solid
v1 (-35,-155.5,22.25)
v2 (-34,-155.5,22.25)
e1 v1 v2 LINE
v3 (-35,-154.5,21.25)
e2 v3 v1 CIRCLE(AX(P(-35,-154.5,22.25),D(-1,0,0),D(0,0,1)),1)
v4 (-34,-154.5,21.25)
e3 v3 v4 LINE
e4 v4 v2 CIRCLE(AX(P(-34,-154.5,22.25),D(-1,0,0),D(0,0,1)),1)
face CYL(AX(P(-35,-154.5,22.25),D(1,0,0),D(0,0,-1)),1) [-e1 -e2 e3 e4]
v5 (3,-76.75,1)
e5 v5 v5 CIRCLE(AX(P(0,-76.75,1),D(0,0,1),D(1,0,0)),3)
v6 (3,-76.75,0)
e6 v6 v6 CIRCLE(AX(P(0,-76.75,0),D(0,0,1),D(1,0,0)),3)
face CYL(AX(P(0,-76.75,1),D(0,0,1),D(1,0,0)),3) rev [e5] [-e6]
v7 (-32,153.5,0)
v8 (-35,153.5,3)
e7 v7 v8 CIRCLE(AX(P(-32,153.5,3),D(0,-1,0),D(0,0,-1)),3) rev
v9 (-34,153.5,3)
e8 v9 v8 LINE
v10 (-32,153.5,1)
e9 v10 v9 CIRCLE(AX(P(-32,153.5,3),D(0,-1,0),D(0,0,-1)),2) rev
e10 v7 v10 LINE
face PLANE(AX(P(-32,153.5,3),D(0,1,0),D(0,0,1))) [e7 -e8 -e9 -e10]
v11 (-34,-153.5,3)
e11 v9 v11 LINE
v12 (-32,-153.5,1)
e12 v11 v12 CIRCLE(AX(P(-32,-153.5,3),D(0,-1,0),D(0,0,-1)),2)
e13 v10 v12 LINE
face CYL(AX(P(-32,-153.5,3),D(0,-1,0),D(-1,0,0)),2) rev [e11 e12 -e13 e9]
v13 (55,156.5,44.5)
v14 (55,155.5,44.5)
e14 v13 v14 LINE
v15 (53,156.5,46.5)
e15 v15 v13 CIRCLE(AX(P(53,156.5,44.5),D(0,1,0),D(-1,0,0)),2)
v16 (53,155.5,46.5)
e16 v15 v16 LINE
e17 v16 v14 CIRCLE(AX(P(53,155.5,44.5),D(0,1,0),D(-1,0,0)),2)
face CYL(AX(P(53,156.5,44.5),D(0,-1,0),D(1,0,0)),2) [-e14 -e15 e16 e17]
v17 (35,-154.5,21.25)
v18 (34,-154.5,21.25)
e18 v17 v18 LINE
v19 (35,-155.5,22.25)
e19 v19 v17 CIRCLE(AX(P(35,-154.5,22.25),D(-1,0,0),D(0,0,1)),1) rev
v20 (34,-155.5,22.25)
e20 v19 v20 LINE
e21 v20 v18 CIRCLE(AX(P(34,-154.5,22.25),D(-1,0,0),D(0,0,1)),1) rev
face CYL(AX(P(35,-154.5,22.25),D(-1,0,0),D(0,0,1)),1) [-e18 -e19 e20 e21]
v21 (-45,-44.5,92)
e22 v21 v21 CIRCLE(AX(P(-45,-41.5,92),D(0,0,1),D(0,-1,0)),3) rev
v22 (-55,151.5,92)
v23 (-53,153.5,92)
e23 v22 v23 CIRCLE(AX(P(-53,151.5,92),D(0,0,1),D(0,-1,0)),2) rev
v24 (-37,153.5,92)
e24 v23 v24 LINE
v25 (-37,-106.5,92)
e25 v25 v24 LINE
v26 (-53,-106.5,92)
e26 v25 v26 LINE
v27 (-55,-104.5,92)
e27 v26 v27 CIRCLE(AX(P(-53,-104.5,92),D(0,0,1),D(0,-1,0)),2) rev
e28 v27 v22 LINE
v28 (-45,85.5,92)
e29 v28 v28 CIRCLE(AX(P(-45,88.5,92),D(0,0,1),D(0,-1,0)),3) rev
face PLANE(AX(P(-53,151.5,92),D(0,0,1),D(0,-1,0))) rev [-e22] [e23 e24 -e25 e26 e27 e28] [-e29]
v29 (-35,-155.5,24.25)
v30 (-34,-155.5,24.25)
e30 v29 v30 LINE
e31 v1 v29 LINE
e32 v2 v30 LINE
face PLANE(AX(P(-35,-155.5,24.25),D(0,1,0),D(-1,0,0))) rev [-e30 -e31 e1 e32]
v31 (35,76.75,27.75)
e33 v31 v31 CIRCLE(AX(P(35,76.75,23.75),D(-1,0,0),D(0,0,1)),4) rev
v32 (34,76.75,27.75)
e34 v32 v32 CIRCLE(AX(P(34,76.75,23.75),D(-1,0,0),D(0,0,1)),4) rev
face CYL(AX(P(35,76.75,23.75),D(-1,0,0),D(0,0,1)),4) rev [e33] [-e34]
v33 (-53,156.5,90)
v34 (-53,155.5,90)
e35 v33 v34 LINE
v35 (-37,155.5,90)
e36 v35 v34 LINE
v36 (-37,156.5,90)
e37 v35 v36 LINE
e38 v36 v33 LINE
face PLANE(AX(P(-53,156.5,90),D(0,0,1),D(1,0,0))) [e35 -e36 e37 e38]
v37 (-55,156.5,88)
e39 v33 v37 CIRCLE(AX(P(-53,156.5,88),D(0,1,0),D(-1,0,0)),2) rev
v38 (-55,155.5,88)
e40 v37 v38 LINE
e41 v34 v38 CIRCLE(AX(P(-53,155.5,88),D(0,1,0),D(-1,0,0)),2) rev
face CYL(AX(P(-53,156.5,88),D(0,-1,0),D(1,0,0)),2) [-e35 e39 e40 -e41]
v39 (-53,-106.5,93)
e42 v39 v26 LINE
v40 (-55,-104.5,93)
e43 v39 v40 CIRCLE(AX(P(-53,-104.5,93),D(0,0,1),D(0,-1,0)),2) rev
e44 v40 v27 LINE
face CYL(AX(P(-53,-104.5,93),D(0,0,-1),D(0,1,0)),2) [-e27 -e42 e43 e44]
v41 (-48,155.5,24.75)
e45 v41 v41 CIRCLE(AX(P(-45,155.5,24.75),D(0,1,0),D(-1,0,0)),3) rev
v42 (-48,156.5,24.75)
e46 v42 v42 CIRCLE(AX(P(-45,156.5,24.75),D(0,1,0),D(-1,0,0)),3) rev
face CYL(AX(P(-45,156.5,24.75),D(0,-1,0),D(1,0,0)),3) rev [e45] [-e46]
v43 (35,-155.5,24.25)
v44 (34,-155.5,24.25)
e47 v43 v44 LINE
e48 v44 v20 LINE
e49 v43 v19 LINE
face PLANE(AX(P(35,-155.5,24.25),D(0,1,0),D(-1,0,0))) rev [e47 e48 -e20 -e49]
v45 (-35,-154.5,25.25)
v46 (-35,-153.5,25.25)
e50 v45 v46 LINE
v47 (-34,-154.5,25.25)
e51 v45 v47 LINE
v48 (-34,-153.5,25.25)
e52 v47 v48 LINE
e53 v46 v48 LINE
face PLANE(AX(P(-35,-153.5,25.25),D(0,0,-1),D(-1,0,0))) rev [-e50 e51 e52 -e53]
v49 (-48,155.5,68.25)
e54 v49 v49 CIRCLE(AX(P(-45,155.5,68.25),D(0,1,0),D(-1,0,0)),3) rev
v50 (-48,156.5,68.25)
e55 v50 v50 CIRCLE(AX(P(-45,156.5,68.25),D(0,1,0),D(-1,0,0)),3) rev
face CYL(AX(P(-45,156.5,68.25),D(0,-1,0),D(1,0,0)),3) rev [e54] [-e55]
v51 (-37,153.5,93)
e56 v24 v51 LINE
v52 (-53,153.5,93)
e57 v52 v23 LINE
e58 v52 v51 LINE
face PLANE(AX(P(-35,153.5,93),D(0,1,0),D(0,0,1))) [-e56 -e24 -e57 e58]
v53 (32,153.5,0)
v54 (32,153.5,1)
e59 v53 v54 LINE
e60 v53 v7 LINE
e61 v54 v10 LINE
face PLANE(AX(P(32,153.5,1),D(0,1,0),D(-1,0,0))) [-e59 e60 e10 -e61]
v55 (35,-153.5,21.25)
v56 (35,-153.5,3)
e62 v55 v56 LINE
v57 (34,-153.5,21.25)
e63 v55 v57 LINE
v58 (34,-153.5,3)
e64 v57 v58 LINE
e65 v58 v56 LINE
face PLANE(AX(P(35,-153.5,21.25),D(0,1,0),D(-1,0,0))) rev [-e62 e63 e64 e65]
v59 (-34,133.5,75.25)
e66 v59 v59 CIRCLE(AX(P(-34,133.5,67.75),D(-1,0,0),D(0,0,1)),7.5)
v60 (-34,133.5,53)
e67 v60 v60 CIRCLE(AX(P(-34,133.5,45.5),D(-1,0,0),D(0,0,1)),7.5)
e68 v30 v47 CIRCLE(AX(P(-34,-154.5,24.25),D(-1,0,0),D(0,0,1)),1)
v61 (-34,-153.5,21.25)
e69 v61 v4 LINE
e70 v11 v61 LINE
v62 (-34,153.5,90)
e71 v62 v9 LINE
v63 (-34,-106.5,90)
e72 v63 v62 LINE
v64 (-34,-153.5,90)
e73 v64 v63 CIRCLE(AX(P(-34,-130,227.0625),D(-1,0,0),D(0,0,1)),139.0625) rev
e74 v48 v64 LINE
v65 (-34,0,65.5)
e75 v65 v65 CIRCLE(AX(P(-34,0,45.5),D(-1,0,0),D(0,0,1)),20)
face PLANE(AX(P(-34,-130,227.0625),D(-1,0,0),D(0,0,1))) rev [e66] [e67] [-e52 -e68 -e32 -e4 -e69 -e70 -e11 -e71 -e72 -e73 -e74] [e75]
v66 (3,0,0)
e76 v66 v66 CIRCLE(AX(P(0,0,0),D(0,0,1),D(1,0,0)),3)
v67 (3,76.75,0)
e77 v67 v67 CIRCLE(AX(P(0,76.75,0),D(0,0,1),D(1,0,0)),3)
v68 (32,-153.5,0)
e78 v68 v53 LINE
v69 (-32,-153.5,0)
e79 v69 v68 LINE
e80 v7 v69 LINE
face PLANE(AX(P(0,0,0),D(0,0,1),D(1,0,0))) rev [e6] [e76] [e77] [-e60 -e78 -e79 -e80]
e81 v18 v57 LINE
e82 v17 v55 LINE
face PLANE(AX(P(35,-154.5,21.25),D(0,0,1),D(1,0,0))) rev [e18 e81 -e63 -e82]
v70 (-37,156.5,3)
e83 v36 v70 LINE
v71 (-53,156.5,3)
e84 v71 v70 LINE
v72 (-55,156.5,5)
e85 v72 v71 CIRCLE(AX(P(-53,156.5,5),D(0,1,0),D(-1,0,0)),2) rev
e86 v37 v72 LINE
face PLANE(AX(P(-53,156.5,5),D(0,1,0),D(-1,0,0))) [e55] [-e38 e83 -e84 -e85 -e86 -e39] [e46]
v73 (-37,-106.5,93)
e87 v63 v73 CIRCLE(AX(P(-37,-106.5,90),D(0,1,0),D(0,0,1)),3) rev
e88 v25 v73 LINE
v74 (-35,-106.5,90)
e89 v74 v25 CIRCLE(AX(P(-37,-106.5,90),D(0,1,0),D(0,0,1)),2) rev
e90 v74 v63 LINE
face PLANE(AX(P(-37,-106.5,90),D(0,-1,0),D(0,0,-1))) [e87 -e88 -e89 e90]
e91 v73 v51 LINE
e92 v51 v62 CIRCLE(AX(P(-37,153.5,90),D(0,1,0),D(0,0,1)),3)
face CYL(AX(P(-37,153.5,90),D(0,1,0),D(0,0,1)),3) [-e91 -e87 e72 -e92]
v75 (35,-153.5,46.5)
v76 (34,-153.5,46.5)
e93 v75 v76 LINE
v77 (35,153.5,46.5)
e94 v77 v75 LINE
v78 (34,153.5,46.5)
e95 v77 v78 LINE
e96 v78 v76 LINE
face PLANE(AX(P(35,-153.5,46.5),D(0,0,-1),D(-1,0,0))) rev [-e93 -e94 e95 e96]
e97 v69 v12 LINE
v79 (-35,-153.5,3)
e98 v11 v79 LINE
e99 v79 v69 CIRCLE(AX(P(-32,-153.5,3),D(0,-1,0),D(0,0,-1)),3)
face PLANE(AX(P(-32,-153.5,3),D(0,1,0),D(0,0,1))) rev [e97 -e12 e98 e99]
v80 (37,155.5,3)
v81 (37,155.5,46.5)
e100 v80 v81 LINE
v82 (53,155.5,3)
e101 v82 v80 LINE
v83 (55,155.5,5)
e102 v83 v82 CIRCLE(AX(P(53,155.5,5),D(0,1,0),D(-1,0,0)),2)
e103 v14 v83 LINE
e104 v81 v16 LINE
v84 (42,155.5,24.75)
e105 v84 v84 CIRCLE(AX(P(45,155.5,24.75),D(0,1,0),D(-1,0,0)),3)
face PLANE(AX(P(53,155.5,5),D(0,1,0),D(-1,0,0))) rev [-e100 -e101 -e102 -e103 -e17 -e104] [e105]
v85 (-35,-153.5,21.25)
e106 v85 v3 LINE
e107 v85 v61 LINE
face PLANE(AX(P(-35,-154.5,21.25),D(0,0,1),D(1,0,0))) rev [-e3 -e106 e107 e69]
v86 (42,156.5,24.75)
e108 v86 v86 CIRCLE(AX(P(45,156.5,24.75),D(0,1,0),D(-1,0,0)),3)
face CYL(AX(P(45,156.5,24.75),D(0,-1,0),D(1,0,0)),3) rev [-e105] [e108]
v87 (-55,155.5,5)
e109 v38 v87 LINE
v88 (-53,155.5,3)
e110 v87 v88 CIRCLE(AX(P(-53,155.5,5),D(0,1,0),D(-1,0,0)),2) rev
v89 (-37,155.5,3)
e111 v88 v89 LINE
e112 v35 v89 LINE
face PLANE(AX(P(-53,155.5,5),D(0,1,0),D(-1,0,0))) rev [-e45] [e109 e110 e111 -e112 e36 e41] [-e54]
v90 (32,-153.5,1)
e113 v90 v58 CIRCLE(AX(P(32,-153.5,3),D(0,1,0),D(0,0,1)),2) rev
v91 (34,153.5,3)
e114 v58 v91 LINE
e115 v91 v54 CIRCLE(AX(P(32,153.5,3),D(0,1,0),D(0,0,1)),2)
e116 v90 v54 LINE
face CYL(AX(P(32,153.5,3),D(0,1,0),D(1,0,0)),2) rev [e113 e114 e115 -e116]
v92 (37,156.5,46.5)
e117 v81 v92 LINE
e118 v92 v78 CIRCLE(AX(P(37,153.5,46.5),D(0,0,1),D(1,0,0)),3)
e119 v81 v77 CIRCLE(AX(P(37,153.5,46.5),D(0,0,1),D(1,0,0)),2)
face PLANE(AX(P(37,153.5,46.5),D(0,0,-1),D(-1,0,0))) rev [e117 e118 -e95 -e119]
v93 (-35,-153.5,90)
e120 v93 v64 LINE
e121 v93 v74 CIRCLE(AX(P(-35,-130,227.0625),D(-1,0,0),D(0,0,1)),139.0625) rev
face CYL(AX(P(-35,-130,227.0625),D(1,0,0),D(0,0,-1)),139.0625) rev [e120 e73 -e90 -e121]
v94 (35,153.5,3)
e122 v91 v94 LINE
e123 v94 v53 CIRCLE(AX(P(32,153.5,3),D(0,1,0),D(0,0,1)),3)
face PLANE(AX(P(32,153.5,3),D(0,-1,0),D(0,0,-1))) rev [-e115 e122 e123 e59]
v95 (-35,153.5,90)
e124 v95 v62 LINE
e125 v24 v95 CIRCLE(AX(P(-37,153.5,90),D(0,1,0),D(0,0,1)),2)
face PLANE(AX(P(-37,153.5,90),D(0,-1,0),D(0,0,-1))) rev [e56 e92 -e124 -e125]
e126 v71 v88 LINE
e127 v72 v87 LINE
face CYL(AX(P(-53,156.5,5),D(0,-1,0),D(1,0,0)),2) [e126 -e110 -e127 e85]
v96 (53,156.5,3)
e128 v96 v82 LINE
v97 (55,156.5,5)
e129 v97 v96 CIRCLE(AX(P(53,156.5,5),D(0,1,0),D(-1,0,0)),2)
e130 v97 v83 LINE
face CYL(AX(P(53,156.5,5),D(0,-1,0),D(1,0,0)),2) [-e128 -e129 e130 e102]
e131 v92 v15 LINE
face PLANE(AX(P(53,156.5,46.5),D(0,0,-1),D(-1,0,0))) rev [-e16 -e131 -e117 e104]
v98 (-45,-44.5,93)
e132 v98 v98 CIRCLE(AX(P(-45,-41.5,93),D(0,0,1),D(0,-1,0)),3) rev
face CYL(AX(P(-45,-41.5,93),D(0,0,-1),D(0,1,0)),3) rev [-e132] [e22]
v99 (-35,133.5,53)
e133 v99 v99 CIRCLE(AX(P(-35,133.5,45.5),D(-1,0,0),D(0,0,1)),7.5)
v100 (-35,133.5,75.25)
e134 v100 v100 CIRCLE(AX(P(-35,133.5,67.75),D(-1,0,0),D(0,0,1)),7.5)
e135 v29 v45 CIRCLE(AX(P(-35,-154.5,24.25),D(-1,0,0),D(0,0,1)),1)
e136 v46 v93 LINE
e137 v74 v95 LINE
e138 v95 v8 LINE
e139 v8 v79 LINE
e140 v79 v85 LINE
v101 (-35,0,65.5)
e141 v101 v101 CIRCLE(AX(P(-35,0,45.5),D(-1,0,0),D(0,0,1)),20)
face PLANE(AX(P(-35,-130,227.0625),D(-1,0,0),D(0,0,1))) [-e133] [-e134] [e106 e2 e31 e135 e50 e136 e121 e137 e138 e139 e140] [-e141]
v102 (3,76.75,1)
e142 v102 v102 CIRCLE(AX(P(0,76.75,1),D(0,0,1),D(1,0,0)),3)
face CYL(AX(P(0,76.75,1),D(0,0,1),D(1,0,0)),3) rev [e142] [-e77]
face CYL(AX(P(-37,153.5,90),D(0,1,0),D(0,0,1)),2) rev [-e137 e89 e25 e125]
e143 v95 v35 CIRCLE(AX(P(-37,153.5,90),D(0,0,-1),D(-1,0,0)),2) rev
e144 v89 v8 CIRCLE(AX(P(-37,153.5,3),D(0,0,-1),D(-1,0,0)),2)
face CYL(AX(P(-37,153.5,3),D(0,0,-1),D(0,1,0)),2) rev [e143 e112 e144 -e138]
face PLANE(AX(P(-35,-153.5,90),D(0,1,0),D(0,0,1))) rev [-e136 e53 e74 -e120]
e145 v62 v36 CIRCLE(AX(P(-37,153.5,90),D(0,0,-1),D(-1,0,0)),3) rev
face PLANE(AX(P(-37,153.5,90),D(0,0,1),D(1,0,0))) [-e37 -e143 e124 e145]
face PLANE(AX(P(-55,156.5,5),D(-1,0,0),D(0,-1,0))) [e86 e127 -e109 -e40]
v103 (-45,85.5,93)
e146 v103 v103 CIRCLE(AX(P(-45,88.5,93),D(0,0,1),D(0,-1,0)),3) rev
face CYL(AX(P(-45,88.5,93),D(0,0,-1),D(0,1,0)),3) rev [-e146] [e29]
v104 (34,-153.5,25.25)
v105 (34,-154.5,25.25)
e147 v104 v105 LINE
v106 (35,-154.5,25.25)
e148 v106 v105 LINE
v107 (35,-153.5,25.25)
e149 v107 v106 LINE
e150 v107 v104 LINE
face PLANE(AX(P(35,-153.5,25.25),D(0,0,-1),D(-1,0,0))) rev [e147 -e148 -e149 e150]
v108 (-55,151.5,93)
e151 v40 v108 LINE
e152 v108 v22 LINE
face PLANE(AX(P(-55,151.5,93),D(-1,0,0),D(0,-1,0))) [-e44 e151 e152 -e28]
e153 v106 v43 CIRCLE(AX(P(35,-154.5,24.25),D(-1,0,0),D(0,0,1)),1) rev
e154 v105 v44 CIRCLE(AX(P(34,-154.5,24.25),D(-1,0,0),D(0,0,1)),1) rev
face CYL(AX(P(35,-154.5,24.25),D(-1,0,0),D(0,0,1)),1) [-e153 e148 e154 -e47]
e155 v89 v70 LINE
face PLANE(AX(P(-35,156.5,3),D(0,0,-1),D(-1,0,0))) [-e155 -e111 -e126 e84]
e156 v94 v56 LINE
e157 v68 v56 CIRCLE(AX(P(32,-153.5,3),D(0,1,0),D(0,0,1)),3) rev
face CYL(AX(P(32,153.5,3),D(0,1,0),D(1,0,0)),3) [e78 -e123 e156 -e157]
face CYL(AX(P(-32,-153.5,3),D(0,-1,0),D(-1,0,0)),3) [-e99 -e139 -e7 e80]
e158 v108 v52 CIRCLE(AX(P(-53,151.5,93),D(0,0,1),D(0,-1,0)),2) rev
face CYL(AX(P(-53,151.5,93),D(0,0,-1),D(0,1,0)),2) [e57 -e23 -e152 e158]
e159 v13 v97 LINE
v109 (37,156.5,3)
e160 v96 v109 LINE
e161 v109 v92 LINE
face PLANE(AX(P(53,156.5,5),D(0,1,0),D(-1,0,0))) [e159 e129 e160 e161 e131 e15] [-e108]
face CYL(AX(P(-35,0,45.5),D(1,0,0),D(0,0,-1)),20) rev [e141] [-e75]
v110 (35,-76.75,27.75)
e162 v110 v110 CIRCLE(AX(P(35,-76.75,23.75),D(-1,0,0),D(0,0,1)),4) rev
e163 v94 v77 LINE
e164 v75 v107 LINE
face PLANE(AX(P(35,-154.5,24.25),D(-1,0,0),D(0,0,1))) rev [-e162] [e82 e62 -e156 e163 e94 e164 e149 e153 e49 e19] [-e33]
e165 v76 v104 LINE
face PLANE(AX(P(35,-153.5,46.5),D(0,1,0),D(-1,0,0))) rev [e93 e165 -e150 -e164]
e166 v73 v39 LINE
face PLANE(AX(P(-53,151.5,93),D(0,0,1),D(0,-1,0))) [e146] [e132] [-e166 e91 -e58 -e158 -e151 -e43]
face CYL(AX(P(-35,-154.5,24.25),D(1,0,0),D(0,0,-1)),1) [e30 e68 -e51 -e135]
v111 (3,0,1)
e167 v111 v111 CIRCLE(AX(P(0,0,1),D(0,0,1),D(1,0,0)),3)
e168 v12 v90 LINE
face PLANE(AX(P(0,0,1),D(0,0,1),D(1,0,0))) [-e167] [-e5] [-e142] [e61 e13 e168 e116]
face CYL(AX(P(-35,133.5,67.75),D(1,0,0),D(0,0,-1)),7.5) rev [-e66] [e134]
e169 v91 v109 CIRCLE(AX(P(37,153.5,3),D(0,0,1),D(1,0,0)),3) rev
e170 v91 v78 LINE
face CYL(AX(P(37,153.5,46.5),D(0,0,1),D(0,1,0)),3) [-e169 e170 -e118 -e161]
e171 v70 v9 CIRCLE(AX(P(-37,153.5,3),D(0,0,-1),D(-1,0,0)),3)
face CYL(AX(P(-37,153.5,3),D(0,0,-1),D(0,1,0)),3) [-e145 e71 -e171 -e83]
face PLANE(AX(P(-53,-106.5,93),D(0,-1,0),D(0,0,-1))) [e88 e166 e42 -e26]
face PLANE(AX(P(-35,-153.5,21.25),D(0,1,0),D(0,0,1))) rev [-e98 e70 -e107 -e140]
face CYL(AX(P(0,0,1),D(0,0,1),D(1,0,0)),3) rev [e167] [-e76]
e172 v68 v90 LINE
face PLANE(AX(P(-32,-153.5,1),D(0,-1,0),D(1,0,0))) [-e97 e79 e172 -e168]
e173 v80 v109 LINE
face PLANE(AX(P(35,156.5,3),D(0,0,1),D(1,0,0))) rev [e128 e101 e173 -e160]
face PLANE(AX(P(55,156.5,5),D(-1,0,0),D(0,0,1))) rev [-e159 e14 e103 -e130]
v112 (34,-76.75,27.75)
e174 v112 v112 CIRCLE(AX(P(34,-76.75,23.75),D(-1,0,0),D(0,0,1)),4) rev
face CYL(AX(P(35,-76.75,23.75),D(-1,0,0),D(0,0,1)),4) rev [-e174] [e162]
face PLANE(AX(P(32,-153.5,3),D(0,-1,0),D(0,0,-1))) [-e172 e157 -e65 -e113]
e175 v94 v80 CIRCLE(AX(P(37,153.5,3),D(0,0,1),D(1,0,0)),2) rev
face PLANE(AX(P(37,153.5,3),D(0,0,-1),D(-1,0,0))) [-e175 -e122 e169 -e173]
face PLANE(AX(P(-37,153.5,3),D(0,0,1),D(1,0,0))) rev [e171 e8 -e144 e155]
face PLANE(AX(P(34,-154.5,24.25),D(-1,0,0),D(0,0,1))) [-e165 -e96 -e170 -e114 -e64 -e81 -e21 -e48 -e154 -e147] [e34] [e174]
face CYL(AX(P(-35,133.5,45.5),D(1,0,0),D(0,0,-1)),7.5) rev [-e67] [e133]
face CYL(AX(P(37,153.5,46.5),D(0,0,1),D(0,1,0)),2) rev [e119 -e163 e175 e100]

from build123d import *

# Parameters (mm, degrees)
SKETCH1_W                = 64
SKETCH1_H                = 307
SKETCH1_R                = 3
BOSS_EXTRUDE1_DEPTH      = 1
EDGE_FLANGE1_DEPTH       = 307
EDGE_FLANGE1_START       = 1
EDGE_FLANGE1_PROFILE_R   = 7.5
EDGE_FLANGE1_PROFILE_R_2 = 20
EDGE_FLANGE1_FLAT_DEPTH  = 1
EDGE_FLANGE2_DEPTH       = 260
EDGE_FLANGE2_START       = -1
EDGE_FLANGE2_PROFILE_R   = 3
EDGE_FLANGE2_FLAT_DEPTH  = 1
EDGE_FLANGE3_DEPTH       = 87
EDGE_FLANGE3_START       = -1
EDGE_FLANGE3_PROFILE_R   = 3
EDGE_FLANGE3_FLAT_DEPTH  = 1
EDGE_FLANGE4_DEPTH       = 307
EDGE_FLANGE4_START       = 1
EDGE_FLANGE4_PROFILE_R   = 4
EDGE_FLANGE4_FLAT_DEPTH  = 1
EDGE_FLANGE5_DEPTH       = 43.5
EDGE_FLANGE5_START       = 1
EDGE_FLANGE5_PROFILE_R   = 3
EDGE_FLANGE5_FLAT_DEPTH  = 1


# Sheet-metal steps are written as plain solids
with BuildPart() as part:
    # Sketch1 → Boss-Extrude1 (new body)
    with BuildSketch(Plane.XY):
        Rectangle(SKETCH1_W, SKETCH1_H)
        Circle(SKETCH1_R, mode=Mode.SUBTRACT)
        with Locations((0, 76.75)):
            Circle(SKETCH1_R, mode=Mode.SUBTRACT)
        with Locations((0, -76.75)):
            Circle(SKETCH1_R, mode=Mode.SUBTRACT)
    extrude(amount=BOSS_EXTRUDE1_DEPTH)

    # Edge-Flange1 bend section (across the edge) → Edge-Flange1 (add)
    with BuildSketch(Plane(origin=(-34, 153.5, 1), x_dir=(1, 0, 0), z_dir=(0, -1, 0))):
        with BuildLine():
            Line((-1, 2), (0, 2))
            ThreePointArc((0, 2), (0.585786438, 0.585786438), (2, 0))
            Line((2, 0), (2, -1))
            ThreePointArc((2, -1), (-0.121320344, -0.121320344), (-1, 2))
        make_face()
    extrude(amount=EDGE_FLANGE1_DEPTH)

    # Edge-Flange1 profile (on flange) → Edge-Flange1 flat (add)
    with BuildSketch(Plane(origin=(-34, 0, 1), x_dir=(0, -1, 0), z_dir=(-1, 0, 0)).offset(EDGE_FLANGE1_START)):
        with BuildLine():
            Line((-153.5, 89), (-153.5, 2))
            Line((-153.5, 2), (153.5, 2))
            Line((153.5, 2), (153.5, 20.25))
            Line((153.5, 20.25), (154.5, 20.25))
            ThreePointArc((154.5, 20.25), (155.207106781, 20.542893219), (155.5, 21.25))
            Line((155.5, 21.25), (155.5, 23.25))
            ThreePointArc((155.5, 23.25), (155.207106781, 23.957106781), (154.5, 24.25))
            Line((154.5, 24.25), (153.5, 24.25))
            Line((153.5, 24.25), (153.5, 89))
            ThreePointArc((153.5, 89), (130, 87), (106.5, 89))
            Line((106.5, 89), (-153.5, 89))
        make_face()
        with Locations((-133.5, 44.5)):
            Circle(EDGE_FLANGE1_PROFILE_R, mode=Mode.SUBTRACT)
        with Locations((0, 44.5)):
            Circle(EDGE_FLANGE1_PROFILE_R_2, mode=Mode.SUBTRACT)
        with Locations((-133.5, 66.75)):
            Circle(EDGE_FLANGE1_PROFILE_R, mode=Mode.SUBTRACT)
    extrude(amount=-EDGE_FLANGE1_FLAT_DEPTH)

    # Edge-Flange2 bend section (across the edge) → Edge-Flange2 (add)
    with BuildSketch(Plane(origin=(-35, -106.5, 92), x_dir=(0, 0, -1), z_dir=(0, 1, 0))):
        with BuildLine():
            Line((-1, 2), (0, 2))
            ThreePointArc((0, 2), (0.585786438, 0.585786438), (2, 0))
            Line((2, 0), (2, -1))
            ThreePointArc((2, -1), (-0.121320344, -0.121320344), (-1, 2))
        make_face()
    extrude(amount=EDGE_FLANGE2_DEPTH)

    # Edge-Flange2 profile (on flange) → Edge-Flange2 flat (add)
    with BuildSketch(Plane(origin=(-35, 0, 92), x_dir=(0, -1, 0), z_dir=(0, 0, -1)).offset(EDGE_FLANGE2_START)):
        with BuildLine():
            Line((-153.5, 2), (106.5, 2))
            Line((106.5, 2), (106.5, 18))
            ThreePointArc((106.5, 18), (105.914213562, 19.414213562), (104.5, 20))
            Line((104.5, 20), (-151.5, 20))
            ThreePointArc((-151.5, 20), (-152.914213562, 19.414213562), (-153.5, 18))
            Line((-153.5, 18), (-153.5, 2))
        make_face()
        with Locations((41.5, 10)):
            Circle(EDGE_FLANGE2_PROFILE_R, mode=Mode.SUBTRACT)
        with Locations((-88.5, 10)):
            Circle(EDGE_FLANGE2_PROFILE_R, mode=Mode.SUBTRACT)
    extrude(amount=EDGE_FLANGE2_FLAT_DEPTH)

    # Edge-Flange3 bend section (across the edge) → Edge-Flange3 (add)
    with BuildSketch(Plane(origin=(-35, 155.5, 90), x_dir=(0, -1, 0), z_dir=(0, 0, -1))):
        with BuildLine():
            Line((-1, 2), (0, 2))
            ThreePointArc((0, 2), (0.585786438, 0.585786438), (2, 0))
            Line((2, 0), (2, -1))
            ThreePointArc((2, -1), (-0.121320344, -0.121320344), (-1, 2))
        make_face()
    extrude(amount=EDGE_FLANGE3_DEPTH)

    # Edge-Flange3 profile (on flange) → Edge-Flange3 flat (add)
    with BuildSketch(Plane(origin=(-35, 155.5, 0), x_dir=(0, 0, 1), z_dir=(0, -1, 0)).offset(EDGE_FLANGE3_START)):
        with BuildLine():
            Line((3, 2), (90, 2))
            Line((90, 2), (90, 18))
            ThreePointArc((90, 18), (89.414213562, 19.414213562), (88, 20))
            Line((88, 20), (5, 20))
            ThreePointArc((5, 20), (3.585786438, 19.414213562), (3, 18))
            Line((3, 18), (3, 2))
        make_face()
        with Locations((24.75, 10)):
            Circle(EDGE_FLANGE3_PROFILE_R, mode=Mode.SUBTRACT)
        with Locations((68.25, 10)):
            Circle(EDGE_FLANGE3_PROFILE_R, mode=Mode.SUBTRACT)
    extrude(amount=EDGE_FLANGE3_FLAT_DEPTH)

    # Edge-Flange4 bend section (across the edge) → Edge-Flange4 (add)
    with BuildSketch(Plane(origin=(34, -153.5, 1), x_dir=(-1, 0, 0), z_dir=(0, 1, 0))):
        with BuildLine():
            Line((-1, 2), (0, 2))
            ThreePointArc((0, 2), (0.585786438, 0.585786438), (2, 0))
            Line((2, 0), (2, -1))
            ThreePointArc((2, -1), (-0.121320344, -0.121320344), (-1, 2))
        make_face()
    extrude(amount=EDGE_FLANGE4_DEPTH)

    # Edge-Flange4 profile (on flange) → Edge-Flange4 flat (add)
    with BuildSketch(Plane(origin=(34, 0, 1), x_dir=(0, 1, 0), z_dir=(1, 0, 0)).offset(EDGE_FLANGE4_START)):
        with BuildLine():
            ThreePointArc((-155.5, 21.25), (-155.207106781, 20.542893219), (-154.5, 20.25))
            Line((-154.5, 20.25), (-153.5, 20.25))
            Line((-153.5, 20.25), (-153.5, 2))
            Line((-153.5, 2), (153.5, 2))
            Line((153.5, 2), (153.5, 45.5))
            Line((153.5, 45.5), (-153.5, 45.5))
            Line((-153.5, 45.5), (-153.5, 24.25))
            Line((-153.5, 24.25), (-154.5, 24.25))
            ThreePointArc((-154.5, 24.25), (-155.207106781, 23.957106781), (-155.5, 23.25))
            Line((-155.5, 23.25), (-155.5, 21.25))
        make_face()
        with Locations((-76.75, 22.75)):
            Circle(EDGE_FLANGE4_PROFILE_R, mode=Mode.SUBTRACT)
        with Locations((76.75, 22.75)):
            Circle(EDGE_FLANGE4_PROFILE_R, mode=Mode.SUBTRACT)
    extrude(amount=-EDGE_FLANGE4_FLAT_DEPTH)

    # Edge-Flange5 bend section (across the edge) → Edge-Flange5 (add)
    with BuildSketch(Plane(origin=(35, 155.5, 3), x_dir=(0, -1, 0), z_dir=(0, 0, 1))):
        with BuildLine():
            Line((-1, 2), (0, 2))
            ThreePointArc((0, 2), (0.585786438, 0.585786438), (2, 0))
            Line((2, 0), (2, -1))
            ThreePointArc((2, -1), (-0.121320344, -0.121320344), (-1, 2))
        make_face()
    extrude(amount=EDGE_FLANGE5_DEPTH)

    # Edge-Flange5 profile (on flange) → Edge-Flange5 flat (add)
    with BuildSketch(Plane(origin=(35, 155.5, 0), x_dir=(0, 0, 1), z_dir=(0, 1, 0)).offset(EDGE_FLANGE5_START)):
        with BuildLine():
            ThreePointArc((5, 20), (3.585786438, 19.414213562), (3, 18))
            Line((3, 18), (3, 2))
            Line((3, 2), (46.5, 2))
            Line((46.5, 2), (46.5, 18))
            ThreePointArc((46.5, 18), (45.914213562, 19.414213562), (44.5, 20))
            Line((44.5, 20), (5, 20))
        make_face()
        with Locations((24.75, 10)):
            Circle(EDGE_FLANGE5_PROFILE_R, mode=Mode.SUBTRACT)
    extrude(amount=-EDGE_FLANGE5_FLAT_DEPTH)


solid = part.part
